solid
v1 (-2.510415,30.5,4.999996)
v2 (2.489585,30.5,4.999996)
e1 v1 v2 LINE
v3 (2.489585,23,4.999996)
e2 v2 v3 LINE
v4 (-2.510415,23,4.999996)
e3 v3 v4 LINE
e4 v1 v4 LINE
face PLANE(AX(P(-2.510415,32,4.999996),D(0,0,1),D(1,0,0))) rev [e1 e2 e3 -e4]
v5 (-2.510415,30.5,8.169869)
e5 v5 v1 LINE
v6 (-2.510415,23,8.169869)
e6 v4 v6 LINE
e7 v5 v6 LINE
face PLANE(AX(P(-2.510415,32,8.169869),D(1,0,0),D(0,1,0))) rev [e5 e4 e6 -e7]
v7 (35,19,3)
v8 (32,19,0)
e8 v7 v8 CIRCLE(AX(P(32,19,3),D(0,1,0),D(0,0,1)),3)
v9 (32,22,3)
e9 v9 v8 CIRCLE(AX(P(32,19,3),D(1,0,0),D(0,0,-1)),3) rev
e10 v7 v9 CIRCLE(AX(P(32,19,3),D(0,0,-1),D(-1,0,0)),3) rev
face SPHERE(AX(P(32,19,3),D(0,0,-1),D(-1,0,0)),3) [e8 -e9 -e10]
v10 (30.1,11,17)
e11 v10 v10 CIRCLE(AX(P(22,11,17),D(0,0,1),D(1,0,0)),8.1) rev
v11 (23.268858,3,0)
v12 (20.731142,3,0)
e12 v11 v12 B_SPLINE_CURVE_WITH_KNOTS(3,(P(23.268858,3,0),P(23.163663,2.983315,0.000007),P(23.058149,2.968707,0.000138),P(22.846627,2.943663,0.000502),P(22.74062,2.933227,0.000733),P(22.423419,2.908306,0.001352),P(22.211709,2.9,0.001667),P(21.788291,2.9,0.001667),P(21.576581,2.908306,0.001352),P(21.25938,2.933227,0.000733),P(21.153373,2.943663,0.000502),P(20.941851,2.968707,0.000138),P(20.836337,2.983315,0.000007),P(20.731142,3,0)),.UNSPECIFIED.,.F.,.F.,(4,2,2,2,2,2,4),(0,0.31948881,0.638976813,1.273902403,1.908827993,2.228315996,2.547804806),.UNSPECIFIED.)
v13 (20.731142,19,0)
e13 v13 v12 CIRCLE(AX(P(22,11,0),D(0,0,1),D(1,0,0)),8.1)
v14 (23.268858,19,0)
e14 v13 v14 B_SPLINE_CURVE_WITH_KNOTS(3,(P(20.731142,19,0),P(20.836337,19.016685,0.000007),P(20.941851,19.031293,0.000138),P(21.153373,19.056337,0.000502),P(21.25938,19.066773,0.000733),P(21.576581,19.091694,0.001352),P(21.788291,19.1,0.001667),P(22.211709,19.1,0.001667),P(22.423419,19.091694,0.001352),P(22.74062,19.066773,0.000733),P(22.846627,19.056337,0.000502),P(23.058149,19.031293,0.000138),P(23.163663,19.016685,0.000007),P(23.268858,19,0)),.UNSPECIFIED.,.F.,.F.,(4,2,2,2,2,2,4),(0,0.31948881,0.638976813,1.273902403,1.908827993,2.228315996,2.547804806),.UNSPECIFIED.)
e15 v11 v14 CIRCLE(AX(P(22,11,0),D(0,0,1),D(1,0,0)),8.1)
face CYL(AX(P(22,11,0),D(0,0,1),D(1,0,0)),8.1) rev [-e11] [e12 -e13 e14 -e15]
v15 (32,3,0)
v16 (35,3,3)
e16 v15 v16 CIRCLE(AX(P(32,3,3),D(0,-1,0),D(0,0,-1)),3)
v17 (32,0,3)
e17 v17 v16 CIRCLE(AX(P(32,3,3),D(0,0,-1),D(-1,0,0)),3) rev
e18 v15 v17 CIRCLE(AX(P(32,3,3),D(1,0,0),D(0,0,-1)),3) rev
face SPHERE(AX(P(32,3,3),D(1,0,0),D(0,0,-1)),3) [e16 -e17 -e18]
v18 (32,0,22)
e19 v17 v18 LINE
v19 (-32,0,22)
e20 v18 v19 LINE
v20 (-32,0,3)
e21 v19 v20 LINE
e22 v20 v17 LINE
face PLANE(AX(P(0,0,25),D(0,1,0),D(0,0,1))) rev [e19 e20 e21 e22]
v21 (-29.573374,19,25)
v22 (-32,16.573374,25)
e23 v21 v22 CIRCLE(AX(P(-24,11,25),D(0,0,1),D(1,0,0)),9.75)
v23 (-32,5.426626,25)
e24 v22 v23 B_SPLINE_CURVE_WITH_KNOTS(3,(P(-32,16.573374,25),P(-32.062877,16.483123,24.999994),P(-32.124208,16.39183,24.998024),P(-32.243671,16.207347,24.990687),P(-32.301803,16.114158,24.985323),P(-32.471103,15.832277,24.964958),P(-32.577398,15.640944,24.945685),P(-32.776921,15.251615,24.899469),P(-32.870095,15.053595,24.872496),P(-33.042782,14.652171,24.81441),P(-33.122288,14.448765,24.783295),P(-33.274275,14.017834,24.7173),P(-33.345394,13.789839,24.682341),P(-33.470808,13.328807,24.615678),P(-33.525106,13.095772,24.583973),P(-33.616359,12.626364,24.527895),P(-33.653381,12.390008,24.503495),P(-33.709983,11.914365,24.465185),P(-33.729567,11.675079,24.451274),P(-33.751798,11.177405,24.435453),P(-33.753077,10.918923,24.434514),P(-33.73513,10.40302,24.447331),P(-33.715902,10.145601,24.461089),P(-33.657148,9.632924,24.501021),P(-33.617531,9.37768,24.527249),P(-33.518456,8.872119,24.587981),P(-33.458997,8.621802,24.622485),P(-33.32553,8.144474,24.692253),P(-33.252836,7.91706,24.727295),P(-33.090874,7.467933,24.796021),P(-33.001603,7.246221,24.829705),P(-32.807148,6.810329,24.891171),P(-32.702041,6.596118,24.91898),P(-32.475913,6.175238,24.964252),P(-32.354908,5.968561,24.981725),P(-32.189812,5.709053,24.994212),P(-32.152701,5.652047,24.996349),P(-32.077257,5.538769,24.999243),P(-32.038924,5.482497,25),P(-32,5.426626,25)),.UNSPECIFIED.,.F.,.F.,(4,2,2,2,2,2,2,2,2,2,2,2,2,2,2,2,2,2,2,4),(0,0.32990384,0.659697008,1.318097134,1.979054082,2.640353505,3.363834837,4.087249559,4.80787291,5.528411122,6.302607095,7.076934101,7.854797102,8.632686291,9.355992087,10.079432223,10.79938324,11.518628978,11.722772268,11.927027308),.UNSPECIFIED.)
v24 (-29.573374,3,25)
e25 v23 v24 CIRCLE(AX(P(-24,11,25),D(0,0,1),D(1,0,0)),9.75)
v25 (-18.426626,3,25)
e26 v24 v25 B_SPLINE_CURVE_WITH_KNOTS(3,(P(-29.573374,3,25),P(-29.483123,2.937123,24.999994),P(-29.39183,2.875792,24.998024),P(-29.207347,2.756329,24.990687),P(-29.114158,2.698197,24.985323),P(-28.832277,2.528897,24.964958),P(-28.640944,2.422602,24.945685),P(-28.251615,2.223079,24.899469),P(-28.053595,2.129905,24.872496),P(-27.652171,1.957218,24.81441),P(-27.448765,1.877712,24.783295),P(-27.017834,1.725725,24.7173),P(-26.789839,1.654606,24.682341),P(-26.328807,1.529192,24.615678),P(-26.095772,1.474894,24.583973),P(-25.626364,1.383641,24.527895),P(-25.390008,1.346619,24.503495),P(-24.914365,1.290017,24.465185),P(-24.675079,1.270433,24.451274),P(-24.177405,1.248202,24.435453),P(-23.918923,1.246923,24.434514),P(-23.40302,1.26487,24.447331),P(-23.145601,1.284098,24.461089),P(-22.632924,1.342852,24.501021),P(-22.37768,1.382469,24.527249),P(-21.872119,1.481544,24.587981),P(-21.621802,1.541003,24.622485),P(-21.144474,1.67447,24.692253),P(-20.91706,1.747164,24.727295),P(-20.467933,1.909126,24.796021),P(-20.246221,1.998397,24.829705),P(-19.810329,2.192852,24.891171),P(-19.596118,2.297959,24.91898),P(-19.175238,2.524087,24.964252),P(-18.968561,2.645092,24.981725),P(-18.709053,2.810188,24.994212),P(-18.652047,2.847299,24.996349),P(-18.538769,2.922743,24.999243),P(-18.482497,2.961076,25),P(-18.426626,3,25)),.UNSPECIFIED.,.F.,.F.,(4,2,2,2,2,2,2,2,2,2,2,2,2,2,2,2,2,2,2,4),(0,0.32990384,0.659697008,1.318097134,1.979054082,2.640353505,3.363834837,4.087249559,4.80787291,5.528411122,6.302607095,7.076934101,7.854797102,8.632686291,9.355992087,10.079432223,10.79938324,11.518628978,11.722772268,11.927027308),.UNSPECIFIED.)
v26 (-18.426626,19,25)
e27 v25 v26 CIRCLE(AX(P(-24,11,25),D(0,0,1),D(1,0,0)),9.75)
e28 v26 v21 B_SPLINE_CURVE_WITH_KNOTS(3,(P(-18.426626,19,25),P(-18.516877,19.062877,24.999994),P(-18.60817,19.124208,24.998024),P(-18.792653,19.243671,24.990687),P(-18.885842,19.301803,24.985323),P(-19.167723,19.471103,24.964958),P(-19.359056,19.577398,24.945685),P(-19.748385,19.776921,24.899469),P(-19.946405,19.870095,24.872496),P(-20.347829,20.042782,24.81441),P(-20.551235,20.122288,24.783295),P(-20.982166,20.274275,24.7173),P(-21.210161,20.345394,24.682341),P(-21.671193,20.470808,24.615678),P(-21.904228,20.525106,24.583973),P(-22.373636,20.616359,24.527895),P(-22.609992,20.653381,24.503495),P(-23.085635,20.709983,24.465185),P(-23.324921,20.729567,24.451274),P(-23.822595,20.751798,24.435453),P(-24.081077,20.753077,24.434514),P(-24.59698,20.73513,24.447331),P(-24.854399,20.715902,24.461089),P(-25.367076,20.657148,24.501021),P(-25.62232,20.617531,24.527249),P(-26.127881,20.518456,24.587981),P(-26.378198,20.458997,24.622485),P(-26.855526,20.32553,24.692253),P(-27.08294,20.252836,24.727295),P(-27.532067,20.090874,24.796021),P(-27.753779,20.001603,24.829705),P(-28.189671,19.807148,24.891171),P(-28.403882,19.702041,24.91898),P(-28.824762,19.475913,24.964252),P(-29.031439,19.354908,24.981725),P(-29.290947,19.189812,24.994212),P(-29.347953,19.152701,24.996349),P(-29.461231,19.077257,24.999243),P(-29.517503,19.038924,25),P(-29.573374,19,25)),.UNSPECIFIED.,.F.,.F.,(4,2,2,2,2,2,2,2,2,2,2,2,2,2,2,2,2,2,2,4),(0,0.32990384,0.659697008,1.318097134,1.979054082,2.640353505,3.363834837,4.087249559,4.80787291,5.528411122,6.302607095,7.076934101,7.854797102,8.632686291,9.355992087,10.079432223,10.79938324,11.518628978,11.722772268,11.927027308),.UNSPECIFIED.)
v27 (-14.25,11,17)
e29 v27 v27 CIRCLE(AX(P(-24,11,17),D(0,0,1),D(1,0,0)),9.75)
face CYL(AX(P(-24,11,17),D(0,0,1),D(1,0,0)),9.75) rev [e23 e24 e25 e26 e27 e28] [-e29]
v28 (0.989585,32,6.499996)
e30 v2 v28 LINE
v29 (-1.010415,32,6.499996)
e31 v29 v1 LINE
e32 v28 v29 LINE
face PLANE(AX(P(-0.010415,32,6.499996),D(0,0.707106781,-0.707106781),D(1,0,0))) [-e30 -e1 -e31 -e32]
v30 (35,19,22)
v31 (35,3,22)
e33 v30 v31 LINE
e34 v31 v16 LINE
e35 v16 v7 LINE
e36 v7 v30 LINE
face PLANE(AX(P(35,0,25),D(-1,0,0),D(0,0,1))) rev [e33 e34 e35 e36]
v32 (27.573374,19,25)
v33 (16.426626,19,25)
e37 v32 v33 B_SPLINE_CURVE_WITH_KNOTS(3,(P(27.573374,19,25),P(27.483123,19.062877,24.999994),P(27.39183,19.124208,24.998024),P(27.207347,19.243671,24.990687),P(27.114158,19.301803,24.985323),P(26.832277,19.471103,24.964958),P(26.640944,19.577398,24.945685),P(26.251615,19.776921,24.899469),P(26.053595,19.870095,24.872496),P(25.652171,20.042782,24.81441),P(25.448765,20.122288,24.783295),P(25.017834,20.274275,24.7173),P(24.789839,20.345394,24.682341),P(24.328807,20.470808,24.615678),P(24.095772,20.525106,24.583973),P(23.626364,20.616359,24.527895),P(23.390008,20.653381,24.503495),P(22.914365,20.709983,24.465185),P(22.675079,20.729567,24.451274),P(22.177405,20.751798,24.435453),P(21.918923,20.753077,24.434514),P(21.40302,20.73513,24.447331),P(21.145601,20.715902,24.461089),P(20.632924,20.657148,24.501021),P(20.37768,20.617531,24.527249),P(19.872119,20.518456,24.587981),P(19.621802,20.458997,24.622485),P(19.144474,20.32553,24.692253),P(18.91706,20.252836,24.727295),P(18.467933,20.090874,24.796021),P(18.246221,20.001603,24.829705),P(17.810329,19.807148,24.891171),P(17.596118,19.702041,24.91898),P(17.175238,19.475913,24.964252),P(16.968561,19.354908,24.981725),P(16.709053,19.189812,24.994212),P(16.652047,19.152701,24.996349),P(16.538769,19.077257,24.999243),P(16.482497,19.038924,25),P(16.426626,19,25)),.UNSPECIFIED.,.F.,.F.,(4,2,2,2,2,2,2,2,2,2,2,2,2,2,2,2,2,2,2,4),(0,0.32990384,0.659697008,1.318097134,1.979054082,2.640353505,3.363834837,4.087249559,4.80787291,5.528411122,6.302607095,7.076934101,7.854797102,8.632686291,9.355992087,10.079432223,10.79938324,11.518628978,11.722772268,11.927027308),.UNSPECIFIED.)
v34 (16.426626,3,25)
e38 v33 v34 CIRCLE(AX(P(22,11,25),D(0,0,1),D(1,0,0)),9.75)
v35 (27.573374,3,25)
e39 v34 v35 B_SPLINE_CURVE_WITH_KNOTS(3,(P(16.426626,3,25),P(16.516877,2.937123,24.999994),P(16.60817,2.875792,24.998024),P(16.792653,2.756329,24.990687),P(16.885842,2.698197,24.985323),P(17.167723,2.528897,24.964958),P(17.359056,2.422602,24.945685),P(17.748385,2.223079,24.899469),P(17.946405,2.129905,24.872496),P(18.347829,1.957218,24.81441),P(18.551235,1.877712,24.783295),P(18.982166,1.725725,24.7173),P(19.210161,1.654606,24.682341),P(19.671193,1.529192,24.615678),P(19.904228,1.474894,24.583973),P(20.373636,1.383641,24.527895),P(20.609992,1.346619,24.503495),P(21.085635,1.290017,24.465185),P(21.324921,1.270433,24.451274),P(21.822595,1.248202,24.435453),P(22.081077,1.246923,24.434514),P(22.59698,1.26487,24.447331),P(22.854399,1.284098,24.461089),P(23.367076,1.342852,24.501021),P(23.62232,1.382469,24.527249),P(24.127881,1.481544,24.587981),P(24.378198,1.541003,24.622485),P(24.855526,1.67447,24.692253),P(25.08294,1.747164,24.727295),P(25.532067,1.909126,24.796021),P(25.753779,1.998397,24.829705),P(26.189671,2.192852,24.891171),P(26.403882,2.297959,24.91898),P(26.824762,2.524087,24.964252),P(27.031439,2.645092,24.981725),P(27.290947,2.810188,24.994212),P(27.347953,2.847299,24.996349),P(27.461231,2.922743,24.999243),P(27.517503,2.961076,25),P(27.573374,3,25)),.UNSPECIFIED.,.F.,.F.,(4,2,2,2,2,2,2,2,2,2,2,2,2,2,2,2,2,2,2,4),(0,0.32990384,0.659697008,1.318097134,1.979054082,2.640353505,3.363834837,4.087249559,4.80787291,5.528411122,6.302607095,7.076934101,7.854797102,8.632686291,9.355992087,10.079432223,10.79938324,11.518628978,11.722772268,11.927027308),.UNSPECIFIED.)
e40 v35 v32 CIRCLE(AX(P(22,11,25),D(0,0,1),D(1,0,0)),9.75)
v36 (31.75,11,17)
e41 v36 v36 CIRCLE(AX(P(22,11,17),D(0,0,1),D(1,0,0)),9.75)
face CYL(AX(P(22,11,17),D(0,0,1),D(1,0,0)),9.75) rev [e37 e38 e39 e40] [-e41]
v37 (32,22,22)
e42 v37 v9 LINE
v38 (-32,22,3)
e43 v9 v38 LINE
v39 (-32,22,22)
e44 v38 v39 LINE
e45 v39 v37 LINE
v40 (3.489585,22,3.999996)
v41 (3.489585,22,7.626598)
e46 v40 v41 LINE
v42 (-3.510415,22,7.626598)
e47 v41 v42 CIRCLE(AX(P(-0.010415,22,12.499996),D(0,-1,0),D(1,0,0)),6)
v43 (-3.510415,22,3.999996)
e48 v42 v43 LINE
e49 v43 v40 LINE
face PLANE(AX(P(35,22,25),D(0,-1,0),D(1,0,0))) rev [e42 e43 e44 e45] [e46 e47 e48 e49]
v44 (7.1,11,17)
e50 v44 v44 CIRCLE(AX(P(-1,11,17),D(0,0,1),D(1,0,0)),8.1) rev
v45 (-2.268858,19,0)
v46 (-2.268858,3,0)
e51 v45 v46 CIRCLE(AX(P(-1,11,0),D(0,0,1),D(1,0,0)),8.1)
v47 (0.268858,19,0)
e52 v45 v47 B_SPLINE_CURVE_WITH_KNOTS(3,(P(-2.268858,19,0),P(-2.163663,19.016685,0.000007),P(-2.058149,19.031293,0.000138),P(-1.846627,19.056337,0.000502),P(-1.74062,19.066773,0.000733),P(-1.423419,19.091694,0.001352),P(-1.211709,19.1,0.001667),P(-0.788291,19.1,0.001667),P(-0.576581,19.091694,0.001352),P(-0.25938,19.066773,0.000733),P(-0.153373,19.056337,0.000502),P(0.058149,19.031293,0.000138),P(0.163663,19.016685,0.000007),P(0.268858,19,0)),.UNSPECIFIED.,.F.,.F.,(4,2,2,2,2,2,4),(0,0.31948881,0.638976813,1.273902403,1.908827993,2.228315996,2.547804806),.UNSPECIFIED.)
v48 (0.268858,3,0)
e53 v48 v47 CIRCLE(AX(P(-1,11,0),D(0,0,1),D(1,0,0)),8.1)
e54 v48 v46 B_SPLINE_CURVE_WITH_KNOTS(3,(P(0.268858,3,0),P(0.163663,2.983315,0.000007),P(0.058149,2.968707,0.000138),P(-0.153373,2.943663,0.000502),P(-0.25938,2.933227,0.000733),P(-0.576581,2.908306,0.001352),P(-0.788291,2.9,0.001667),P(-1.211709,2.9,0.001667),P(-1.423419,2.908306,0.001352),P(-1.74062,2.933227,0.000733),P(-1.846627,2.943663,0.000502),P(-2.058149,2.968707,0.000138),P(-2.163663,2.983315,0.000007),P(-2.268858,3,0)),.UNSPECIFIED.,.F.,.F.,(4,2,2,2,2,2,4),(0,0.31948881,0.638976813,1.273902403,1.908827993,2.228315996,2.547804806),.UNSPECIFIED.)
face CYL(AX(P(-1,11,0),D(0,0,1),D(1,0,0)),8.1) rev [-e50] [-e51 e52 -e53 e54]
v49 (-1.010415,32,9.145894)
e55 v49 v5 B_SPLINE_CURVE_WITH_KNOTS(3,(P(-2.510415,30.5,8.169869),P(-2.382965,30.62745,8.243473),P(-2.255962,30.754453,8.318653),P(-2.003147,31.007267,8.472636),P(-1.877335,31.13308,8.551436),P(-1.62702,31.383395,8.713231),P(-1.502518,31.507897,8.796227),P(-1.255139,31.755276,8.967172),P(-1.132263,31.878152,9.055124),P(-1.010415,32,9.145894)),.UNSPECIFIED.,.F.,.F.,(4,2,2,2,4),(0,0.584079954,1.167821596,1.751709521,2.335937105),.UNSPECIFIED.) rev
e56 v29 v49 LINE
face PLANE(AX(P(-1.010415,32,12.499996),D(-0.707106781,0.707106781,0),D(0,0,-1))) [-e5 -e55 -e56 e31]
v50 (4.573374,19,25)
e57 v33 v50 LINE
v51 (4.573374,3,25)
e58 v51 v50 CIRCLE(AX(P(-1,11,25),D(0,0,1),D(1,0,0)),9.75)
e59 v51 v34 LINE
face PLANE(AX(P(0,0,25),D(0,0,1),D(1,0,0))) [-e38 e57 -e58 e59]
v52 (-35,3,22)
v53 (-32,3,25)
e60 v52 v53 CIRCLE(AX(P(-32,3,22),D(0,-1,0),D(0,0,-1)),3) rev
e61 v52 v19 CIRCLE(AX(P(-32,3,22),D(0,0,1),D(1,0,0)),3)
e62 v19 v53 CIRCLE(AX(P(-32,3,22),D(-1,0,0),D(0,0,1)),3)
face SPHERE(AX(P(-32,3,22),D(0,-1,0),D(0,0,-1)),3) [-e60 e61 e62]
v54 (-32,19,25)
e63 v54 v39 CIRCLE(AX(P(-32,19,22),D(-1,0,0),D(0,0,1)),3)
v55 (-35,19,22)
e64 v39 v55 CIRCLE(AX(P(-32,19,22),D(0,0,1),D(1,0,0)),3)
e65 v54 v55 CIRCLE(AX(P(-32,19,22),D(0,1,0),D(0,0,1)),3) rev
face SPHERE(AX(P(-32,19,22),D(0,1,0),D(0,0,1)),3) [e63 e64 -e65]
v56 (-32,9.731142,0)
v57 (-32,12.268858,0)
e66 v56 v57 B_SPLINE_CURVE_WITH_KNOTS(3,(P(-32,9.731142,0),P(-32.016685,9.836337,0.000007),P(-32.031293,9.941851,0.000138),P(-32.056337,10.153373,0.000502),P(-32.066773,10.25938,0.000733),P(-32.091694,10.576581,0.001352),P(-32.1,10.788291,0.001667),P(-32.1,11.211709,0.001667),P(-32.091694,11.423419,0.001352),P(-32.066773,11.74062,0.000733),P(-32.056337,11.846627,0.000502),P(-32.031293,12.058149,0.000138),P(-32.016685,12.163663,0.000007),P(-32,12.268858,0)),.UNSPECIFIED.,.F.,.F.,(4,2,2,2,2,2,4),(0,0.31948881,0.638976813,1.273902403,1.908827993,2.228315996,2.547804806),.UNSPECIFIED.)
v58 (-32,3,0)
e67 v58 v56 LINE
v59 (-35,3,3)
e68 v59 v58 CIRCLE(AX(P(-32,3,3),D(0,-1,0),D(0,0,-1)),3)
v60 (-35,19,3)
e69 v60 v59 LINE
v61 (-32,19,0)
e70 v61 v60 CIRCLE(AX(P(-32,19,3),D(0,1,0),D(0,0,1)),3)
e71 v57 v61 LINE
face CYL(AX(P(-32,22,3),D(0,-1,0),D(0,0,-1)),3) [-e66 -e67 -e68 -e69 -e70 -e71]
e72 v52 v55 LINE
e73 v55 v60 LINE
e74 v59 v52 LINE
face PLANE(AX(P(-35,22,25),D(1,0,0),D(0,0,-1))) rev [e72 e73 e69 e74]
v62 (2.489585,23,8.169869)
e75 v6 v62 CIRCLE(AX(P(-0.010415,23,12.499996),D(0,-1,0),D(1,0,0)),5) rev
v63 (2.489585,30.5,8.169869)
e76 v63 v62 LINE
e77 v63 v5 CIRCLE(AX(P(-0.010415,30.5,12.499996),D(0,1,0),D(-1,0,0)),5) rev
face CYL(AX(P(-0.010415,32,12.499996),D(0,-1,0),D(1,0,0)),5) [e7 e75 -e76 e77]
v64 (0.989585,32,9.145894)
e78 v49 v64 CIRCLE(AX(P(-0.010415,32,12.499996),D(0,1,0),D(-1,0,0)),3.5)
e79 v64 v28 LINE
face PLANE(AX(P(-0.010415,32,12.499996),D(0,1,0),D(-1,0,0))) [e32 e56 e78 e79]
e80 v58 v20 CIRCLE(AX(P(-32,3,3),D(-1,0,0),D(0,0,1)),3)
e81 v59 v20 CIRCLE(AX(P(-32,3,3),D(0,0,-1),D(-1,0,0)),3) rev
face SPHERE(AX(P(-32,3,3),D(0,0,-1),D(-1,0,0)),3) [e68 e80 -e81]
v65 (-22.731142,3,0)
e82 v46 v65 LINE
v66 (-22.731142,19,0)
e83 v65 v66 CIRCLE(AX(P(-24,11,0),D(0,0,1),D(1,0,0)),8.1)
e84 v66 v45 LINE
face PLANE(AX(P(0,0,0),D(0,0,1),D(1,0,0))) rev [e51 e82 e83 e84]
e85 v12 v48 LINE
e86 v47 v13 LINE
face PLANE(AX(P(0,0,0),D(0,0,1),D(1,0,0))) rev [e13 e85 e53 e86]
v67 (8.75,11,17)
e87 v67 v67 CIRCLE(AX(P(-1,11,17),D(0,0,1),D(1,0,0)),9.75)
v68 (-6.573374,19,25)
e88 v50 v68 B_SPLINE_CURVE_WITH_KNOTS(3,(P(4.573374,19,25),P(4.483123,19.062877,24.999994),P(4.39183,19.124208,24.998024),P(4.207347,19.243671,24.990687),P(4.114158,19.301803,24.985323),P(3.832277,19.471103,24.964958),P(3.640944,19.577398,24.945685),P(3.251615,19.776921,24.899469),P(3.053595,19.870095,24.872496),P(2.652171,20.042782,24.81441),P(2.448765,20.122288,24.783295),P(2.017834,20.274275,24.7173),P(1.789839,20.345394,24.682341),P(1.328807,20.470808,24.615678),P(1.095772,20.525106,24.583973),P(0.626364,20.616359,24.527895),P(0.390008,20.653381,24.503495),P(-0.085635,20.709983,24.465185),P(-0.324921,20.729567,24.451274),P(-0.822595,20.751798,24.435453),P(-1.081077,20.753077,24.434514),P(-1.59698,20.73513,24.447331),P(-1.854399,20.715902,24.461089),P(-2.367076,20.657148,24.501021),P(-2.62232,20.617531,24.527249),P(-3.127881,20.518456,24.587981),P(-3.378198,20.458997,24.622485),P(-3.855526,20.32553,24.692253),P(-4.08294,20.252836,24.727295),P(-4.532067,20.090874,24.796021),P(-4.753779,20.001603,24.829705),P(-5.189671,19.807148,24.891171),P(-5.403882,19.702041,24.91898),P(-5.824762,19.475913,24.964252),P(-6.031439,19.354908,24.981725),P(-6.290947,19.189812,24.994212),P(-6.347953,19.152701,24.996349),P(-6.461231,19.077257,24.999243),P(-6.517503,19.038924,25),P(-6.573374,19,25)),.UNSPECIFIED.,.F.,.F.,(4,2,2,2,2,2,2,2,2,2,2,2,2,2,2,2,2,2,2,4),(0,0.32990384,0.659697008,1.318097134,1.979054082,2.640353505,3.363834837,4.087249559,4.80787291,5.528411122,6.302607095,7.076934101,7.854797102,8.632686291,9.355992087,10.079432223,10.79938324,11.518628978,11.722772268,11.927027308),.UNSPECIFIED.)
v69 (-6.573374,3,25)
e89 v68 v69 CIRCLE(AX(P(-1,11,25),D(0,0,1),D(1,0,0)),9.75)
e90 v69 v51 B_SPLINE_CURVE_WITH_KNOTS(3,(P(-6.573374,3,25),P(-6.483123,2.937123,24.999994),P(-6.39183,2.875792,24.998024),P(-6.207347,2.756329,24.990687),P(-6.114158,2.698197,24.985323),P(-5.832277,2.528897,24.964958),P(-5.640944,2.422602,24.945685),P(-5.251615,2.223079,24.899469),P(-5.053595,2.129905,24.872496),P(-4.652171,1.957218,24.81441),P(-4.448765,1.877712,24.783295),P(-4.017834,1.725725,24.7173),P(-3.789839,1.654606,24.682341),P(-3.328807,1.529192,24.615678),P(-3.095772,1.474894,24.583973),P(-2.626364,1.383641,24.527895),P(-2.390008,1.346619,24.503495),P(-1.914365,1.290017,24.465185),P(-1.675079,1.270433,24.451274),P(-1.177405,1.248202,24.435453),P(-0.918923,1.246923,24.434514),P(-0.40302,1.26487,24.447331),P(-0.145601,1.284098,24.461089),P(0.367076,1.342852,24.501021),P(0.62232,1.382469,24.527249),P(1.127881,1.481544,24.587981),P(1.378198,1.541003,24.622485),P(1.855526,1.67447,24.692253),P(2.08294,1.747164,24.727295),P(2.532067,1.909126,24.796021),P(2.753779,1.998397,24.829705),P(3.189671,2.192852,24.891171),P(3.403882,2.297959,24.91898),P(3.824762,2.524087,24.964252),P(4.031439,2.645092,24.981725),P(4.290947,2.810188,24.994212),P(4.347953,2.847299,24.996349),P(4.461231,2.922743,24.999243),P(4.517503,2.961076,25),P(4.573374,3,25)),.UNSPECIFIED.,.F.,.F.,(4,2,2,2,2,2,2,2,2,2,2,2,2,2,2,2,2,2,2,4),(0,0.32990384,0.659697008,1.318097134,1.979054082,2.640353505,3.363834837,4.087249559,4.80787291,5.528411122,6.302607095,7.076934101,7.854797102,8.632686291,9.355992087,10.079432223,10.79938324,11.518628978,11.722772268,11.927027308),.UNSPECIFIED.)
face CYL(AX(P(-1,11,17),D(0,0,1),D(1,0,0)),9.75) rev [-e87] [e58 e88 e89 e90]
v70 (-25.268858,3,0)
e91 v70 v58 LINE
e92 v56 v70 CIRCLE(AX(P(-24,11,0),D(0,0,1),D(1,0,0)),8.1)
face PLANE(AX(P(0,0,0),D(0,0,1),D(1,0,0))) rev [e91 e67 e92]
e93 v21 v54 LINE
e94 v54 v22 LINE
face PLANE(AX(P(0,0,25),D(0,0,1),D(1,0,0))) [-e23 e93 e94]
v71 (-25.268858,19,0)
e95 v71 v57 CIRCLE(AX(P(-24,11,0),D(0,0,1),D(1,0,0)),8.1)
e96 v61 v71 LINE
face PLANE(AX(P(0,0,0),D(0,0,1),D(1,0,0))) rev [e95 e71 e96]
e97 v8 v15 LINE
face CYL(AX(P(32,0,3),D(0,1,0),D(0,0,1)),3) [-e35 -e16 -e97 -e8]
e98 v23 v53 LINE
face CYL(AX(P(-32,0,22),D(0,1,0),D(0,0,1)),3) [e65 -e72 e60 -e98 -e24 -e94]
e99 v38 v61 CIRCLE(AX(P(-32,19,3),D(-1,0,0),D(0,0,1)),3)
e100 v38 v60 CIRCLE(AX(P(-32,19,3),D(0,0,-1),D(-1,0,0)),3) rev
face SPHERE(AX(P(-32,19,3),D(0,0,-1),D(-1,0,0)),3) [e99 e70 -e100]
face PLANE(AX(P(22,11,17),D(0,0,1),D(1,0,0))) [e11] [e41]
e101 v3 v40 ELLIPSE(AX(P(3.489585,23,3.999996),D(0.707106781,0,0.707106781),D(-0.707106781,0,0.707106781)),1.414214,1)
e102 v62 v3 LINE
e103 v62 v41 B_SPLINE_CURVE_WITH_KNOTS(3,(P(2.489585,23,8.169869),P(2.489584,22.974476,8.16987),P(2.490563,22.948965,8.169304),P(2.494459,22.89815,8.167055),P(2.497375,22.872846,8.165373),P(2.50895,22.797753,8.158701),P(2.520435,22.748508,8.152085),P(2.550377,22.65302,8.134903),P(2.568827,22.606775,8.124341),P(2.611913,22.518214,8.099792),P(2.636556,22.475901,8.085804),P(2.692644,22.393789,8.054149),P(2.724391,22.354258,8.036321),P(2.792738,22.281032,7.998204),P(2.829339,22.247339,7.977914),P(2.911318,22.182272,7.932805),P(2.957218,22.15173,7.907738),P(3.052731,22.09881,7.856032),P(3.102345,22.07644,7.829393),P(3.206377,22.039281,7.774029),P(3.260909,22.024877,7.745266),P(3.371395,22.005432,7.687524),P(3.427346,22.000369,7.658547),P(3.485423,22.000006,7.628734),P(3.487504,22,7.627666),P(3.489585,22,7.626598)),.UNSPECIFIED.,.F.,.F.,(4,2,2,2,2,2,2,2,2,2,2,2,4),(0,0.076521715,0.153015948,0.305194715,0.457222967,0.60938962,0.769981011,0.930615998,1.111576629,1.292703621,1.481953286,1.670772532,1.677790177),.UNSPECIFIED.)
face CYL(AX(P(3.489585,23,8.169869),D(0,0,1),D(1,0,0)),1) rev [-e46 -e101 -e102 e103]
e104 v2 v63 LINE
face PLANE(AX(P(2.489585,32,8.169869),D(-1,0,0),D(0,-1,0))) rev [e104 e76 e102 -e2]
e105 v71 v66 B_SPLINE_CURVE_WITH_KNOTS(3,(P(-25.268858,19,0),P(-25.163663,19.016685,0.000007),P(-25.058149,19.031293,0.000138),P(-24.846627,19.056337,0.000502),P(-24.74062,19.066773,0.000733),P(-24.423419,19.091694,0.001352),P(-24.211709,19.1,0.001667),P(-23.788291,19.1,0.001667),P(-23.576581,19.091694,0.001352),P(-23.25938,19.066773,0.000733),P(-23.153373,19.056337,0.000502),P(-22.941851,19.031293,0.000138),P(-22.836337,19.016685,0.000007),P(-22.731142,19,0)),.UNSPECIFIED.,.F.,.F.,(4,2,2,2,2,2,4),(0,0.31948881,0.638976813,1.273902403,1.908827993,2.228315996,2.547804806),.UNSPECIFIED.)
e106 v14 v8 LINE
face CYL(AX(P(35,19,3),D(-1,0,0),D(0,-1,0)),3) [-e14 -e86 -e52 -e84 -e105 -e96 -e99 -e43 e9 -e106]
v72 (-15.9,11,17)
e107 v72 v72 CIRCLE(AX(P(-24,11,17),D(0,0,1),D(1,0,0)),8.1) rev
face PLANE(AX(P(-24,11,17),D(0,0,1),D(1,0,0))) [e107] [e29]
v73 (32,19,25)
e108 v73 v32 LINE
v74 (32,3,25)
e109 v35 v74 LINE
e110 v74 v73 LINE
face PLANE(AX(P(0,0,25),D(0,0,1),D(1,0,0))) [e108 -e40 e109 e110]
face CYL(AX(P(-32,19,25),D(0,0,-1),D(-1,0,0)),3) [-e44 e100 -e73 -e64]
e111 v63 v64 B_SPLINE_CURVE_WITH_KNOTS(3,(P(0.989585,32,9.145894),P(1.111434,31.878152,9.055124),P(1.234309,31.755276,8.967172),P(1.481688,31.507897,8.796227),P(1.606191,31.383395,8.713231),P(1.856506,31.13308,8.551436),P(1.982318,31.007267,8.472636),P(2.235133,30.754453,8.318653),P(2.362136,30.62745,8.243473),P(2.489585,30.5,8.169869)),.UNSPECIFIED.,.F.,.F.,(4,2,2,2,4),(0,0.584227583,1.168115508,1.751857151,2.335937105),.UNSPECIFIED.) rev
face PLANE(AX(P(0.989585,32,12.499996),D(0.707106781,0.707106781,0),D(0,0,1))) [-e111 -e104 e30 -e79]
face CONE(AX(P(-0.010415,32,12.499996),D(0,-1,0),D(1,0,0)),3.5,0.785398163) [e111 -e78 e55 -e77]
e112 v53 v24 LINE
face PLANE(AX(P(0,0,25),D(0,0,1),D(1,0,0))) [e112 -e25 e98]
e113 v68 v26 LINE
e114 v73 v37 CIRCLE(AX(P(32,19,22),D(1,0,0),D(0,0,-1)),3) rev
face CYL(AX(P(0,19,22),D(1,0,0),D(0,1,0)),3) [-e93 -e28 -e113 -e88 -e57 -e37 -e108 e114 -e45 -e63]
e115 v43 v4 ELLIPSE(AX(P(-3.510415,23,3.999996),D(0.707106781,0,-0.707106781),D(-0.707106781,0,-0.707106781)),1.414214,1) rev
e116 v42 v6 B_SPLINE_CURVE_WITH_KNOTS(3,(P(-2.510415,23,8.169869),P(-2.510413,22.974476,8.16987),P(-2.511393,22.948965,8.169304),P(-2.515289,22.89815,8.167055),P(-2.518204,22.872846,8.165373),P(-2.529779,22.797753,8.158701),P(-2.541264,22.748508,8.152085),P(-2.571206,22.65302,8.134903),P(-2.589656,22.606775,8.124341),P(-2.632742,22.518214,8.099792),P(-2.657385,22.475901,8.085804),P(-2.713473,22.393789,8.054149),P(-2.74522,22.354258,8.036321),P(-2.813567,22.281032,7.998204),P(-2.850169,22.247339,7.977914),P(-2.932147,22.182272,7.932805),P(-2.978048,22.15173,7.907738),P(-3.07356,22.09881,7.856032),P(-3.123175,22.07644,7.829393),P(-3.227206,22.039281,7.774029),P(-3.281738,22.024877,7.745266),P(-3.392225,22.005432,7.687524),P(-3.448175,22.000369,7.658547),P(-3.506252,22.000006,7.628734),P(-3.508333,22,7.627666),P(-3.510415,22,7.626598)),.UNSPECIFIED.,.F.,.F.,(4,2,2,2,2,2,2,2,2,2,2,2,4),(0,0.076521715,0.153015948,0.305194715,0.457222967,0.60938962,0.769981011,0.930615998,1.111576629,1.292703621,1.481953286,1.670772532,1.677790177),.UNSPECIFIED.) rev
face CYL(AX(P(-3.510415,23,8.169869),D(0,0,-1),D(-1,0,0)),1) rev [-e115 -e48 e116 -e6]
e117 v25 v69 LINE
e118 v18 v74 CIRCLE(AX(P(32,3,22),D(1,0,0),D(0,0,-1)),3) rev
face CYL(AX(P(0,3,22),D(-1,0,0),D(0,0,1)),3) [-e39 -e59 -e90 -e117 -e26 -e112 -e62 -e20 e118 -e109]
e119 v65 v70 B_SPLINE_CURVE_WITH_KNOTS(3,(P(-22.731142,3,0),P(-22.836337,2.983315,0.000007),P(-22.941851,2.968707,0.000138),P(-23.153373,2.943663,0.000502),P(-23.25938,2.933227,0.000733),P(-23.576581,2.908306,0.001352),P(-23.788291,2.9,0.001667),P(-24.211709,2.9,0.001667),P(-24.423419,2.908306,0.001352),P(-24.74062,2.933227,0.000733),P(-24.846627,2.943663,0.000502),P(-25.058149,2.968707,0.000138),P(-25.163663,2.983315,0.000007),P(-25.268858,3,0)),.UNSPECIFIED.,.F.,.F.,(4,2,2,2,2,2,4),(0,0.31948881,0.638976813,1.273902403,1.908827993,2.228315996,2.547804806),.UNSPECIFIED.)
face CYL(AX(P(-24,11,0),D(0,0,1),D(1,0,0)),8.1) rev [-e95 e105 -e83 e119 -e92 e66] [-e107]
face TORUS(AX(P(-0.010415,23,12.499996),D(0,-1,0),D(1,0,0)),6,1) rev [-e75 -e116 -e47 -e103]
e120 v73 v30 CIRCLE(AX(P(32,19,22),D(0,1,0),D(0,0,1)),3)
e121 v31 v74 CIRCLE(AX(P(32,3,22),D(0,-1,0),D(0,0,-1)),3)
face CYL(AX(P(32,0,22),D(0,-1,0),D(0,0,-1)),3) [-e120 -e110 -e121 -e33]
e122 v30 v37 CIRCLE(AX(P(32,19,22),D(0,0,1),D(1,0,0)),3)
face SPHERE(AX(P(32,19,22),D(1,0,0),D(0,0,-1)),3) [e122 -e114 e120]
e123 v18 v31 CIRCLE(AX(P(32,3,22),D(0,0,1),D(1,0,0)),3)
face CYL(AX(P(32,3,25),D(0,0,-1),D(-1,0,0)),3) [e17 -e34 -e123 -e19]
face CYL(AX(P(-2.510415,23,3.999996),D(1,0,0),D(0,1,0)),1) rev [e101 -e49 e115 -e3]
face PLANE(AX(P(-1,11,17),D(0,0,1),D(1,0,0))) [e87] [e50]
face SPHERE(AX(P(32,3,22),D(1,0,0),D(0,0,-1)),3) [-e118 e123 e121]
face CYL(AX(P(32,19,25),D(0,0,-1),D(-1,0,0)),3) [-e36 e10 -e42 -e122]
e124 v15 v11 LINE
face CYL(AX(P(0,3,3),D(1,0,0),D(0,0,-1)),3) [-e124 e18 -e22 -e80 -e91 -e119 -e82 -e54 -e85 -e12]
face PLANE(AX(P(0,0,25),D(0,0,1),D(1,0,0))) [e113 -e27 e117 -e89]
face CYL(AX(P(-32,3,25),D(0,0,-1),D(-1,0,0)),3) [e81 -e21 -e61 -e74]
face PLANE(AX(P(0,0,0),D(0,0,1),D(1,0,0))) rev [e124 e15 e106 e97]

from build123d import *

# Parameters (mm, degrees)
BOSS_EXTRUDE1_DEPTH = 25
SKETCH2_R           = 8.1
CUT_EXTRUDE1_DEPTH  = 49.311489317
SKETCH3_R           = 9.75
CUT_EXTRUDE2_DEPTH  = 8
LPATTERN1_COUNT     = 3
LPATTERN1_PITCH     = 23
FILLET2_R           = 3
BOSS_EXTRUDE2_DEPTH = 10
CHAMFER1_SIZE       = 1.5
FILLET3_R           = 1


with BuildPart() as part:
    # Sketch1 → Boss-Extrude1 (new body)
    with BuildSketch(Plane.XY):
        Polygon((0, 0), (35, 0), (35, 22), (-35, 22), (-35, 0), align=None)
    extrude(amount=BOSS_EXTRUDE1_DEPTH)

    # Sketch2 → Cut-Extrude1 (cut, symmetric)
    with BuildSketch(Plane.XY.offset(25)):
        with Locations((-24, 11)):
            Circle(SKETCH2_R)
    cut_extrude1 = extrude(amount=CUT_EXTRUDE1_DEPTH, both=True, mode=Mode.SUBTRACT)

    # Sketch3 → Cut-Extrude2 (cut)
    with BuildSketch(Plane.XY.offset(25)):
        with Locations((-24, 11)):
            Circle(SKETCH3_R)
    cut_extrude2 = extrude(amount=-CUT_EXTRUDE2_DEPTH, mode=Mode.SUBTRACT)

    # LPattern1: Cut-Extrude1, Cut-Extrude2 ×3
    with Locations(*[(i * LPATTERN1_PITCH, 0, 0) for i in range(1, LPATTERN1_COUNT)]):
        add(cut_extrude1, mode=Mode.SUBTRACT)
        add(cut_extrude2, mode=Mode.SUBTRACT)

    # Fillet2
    # the kernel refuses this fillet: 3 mm, written as the material it takes off along each edge
    with BuildSketch(Plane(origin=(32, 3, 22), x_dir=(1, 0, 0), z_dir=(0, -1, 0))) as fillet2_piece_1_section:
        Polygon((0, 0), (FILLET2_R, 0), (FILLET2_R, FILLET2_R), (0, FILLET2_R), align=None)
    fillet2_piece_1 = extrude(amount=FILLET2_R, mode=Mode.PRIVATE)
    fillet2_piece_1 = fillet2_piece_1 - Plane(origin=(32, 3, 22), x_dir=(-0.7071067811865475, 0, -0.7071067811865475), z_dir=(0, -1, 0)) * Sphere(FILLET2_R, mode=Mode.PRIVATE)
    add(fillet2_piece_1, mode=Mode.SUBTRACT)
    with BuildSketch(Plane(origin=(32, 19, 22), x_dir=(0, 0, 1), z_dir=(1, 0, 0))) as fillet2_piece_2_section:
        Polygon((0, 0), (FILLET2_R, 0), (FILLET2_R, -FILLET2_R), (0, -FILLET2_R), align=None)
    fillet2_piece_2 = extrude(amount=FILLET2_R, mode=Mode.PRIVATE)
    fillet2_piece_2 = fillet2_piece_2 - Plane(origin=(32, 19, 22), x_dir=(0, -0.7071067811865475, -0.7071067811865475), z_dir=(1, 0, 0)) * Sphere(FILLET2_R, mode=Mode.PRIVATE)
    add(fillet2_piece_2, mode=Mode.SUBTRACT)
    with BuildSketch(Plane(origin=(-32, 19, 22), x_dir=(0, 0, 1), z_dir=(-1, 0, 0))) as fillet2_piece_3_section:
        Polygon((0, 0), (FILLET2_R, 0), (FILLET2_R, FILLET2_R), (0, FILLET2_R), align=None)
    fillet2_piece_3 = extrude(amount=FILLET2_R, mode=Mode.PRIVATE)
    fillet2_piece_3 = fillet2_piece_3 - Plane(origin=(-32, 19, 22), x_dir=(0, -0.7071067811865475, -0.7071067811865475), z_dir=(-1, 0, 0)) * Sphere(FILLET2_R, mode=Mode.PRIVATE)
    add(fillet2_piece_3, mode=Mode.SUBTRACT)
    with BuildSketch(Plane(origin=(-32, 3, 22), x_dir=(-1, 0, 0), z_dir=(0, -1, 0))) as fillet2_piece_4_section:
        Polygon((0, 0), (FILLET2_R, 0), (FILLET2_R, -FILLET2_R), (0, -FILLET2_R), align=None)
    fillet2_piece_4 = extrude(amount=FILLET2_R, mode=Mode.PRIVATE)
    fillet2_piece_4 = fillet2_piece_4 - Plane(origin=(-32, 3, 22), x_dir=(0.7071067811865475, 0, -0.7071067811865475), z_dir=(0, -1, 0)) * Sphere(FILLET2_R, mode=Mode.PRIVATE)
    add(fillet2_piece_4, mode=Mode.SUBTRACT)
    with BuildSketch(Plane(origin=(-32, 19, 3), x_dir=(-1, 0, 0), z_dir=(0, 0, -1))) as fillet2_piece_5_section:
        Polygon((0, 0), (FILLET2_R, 0), (FILLET2_R, FILLET2_R), (0, FILLET2_R), align=None)
    fillet2_piece_5 = extrude(amount=FILLET2_R, mode=Mode.PRIVATE)
    fillet2_piece_5 = fillet2_piece_5 - Plane(origin=(-32, 19, 3), x_dir=(0.7071067811865475, -0.7071067811865475, 0), z_dir=(0, 0, -1)) * Sphere(FILLET2_R, mode=Mode.PRIVATE)
    add(fillet2_piece_5, mode=Mode.SUBTRACT)
    with BuildSketch(Plane(origin=(-32, 3, 3), x_dir=(0, 0, -1), z_dir=(0, -1, 0))) as fillet2_piece_6_section:
        Polygon((0, 0), (FILLET2_R, 0), (FILLET2_R, -FILLET2_R), (0, -FILLET2_R), align=None)
    fillet2_piece_6 = extrude(amount=FILLET2_R, mode=Mode.PRIVATE)
    fillet2_piece_6 = fillet2_piece_6 - Plane(origin=(-32, 3, 3), x_dir=(0.7071067811865475, 0, 0.7071067811865475), z_dir=(0, -1, 0)) * Sphere(FILLET2_R, mode=Mode.PRIVATE)
    add(fillet2_piece_6, mode=Mode.SUBTRACT)
    with BuildSketch(Plane(origin=(32, 19, 3), x_dir=(0, 0, -1), z_dir=(1, 0, 0))) as fillet2_piece_7_section:
        Polygon((0, 0), (FILLET2_R, 0), (FILLET2_R, FILLET2_R), (0, FILLET2_R), align=None)
    fillet2_piece_7 = extrude(amount=FILLET2_R, mode=Mode.PRIVATE)
    fillet2_piece_7 = fillet2_piece_7 - Plane(origin=(32, 19, 3), x_dir=(0, -0.7071067811865475, 0.7071067811865475), z_dir=(1, 0, 0)) * Sphere(FILLET2_R, mode=Mode.PRIVATE)
    add(fillet2_piece_7, mode=Mode.SUBTRACT)
    with BuildSketch(Plane(origin=(32, 3, 3), x_dir=(1, 0, 0), z_dir=(0, -1, 0))) as fillet2_piece_8_section:
        Polygon((0, 0), (FILLET2_R, 0), (FILLET2_R, -FILLET2_R), (0, -FILLET2_R), align=None)
    fillet2_piece_8 = extrude(amount=FILLET2_R, mode=Mode.PRIVATE)
    fillet2_piece_8 = fillet2_piece_8 - Plane(origin=(32, 3, 3), x_dir=(-0.7071067811865475, 0, 0.7071067811865475), z_dir=(0, -1, 0)) * Sphere(FILLET2_R, mode=Mode.PRIVATE)
    add(fillet2_piece_8, mode=Mode.SUBTRACT)
    with BuildSketch(Plane(origin=(35, 3, 25), x_dir=(0, 0, -1), z_dir=(0, 1, 0)), Plane(origin=(-35, 19, 25), x_dir=(0, 0, -1), z_dir=(0, -1, 0)), Plane(origin=(-35, 19, 0), x_dir=(1, 0, 0), z_dir=(0, -1, 0))) as fillet2_piece_9:
        with BuildLine():
            CenterArc((FILLET2_R, FILLET2_R), FILLET2_R, 180, 90)
            Line((0, FILLET2_R), (0, 0))
            Line((0, 0), (FILLET2_R, 0))
        make_face()
    extrude(amount=16, mode=Mode.SUBTRACT)
    with BuildSketch(Plane(origin=(32, 22, 25), x_dir=(0, -1, 0), z_dir=(-1, 0, 0)), Plane(origin=(32, 0, 25), x_dir=(0, 0, -1), z_dir=(-1, 0, 0)), Plane(origin=(-32, 0, 0), x_dir=(0, 0, 1), z_dir=(1, 0, 0))) as fillet2_piece_10:
        with BuildLine():
            CenterArc((FILLET2_R, -FILLET2_R), FILLET2_R, 90, 90)
            Line((0, -FILLET2_R), (0, 0))
            Line((0, 0), (FILLET2_R, 0))
        make_face()
    extrude(amount=64, mode=Mode.SUBTRACT)
    with BuildSketch(Plane(origin=(32, 22, 0), x_dir=(0, -1, 0), z_dir=(-1, 0, 0))) as fillet2_piece_11:
        with BuildLine():
            CenterArc((FILLET2_R, FILLET2_R), FILLET2_R, 180, 90)
            Line((0, FILLET2_R), (0, 0))
            Line((0, 0), (FILLET2_R, 0))
        make_face()
    extrude(amount=64, mode=Mode.SUBTRACT)
    with BuildSketch(Plane(origin=(35, 3, 0), x_dir=(0, 0, 1), z_dir=(0, 1, 0))) as fillet2_piece_12:
        with BuildLine():
            CenterArc((FILLET2_R, -FILLET2_R), FILLET2_R, 90, 90)
            Line((0, -FILLET2_R), (0, 0))
            Line((0, 0), (FILLET2_R, 0))
        make_face()
    extrude(amount=16, mode=Mode.SUBTRACT)
    with BuildSketch(Plane(origin=(-35, 0, 3), x_dir=(1, 0, 0), z_dir=(0, 0, 1)), Plane(origin=(-35, 22, 3), x_dir=(0, -1, 0), z_dir=(0, 0, 1))) as fillet2_piece_13:
        with BuildLine():
            CenterArc((FILLET2_R, FILLET2_R), FILLET2_R, 180, 90)
            Line((0, FILLET2_R), (0, 0))
            Line((0, 0), (FILLET2_R, 0))
        make_face()
    extrude(amount=19, mode=Mode.SUBTRACT)
    with BuildSketch(Plane(origin=(35, 22, 3), x_dir=(0, -1, 0), z_dir=(0, 0, 1)), Plane(origin=(35, 0, 3), x_dir=(-1, 0, 0), z_dir=(0, 0, 1))) as fillet2_piece_14:
        with BuildLine():
            CenterArc((FILLET2_R, -FILLET2_R), FILLET2_R, 90, 90)
            Line((0, -FILLET2_R), (0, 0))
            Line((0, 0), (FILLET2_R, 0))
        make_face()
    extrude(amount=19, mode=Mode.SUBTRACT)

    # Sketch5 → Boss-Extrude2 (add)
    with BuildSketch(Plane(origin=(0, 22, 0), x_dir=(1, 0, 0), z_dir=(0, 1, 0))):
        with BuildLine():
            Line((-2.5104146, -8.169868643), (-2.5104146, -4.999995661))
            Line((-2.5104146, -4.999995661), (2.4895854, -4.999995661))
            Line((2.4895854, -4.999995661), (2.4895854, -8.169868643))
            ThreePointArc((2.4895854, -8.169868643), (-0.0104146, -17.499995661), (-2.5104146, -8.169868643))
        make_face()
    extrude(amount=BOSS_EXTRUDE2_DEPTH)

    # Chamfer1
    chamfer1_edges = [part.edges().sort_by_distance(p)[0] for p in [
        (2.4895854, 32, 6.584932152),
        (-0.0104146, 32, 4.999995661),
        (-2.5104146, 32, 6.584932152),
        (-0.0104146, 32, 17.499995661),
    ]]
    chamfer(chamfer1_edges, length=CHAMFER1_SIZE)

    # Fillet3
    fillet3_edges = [part.edges().sort_by_distance(p)[0] for p in [
        (2.4895854, 22, 6.584932152),
        (-0.0104146, 22, 4.999995661),
        (-2.5104146, 22, 6.584932152),
        (-0.0104146, 22, 17.499995661),
    ]]
    fillet(fillet3_edges, radius=FILLET3_R)


solid = part.part
